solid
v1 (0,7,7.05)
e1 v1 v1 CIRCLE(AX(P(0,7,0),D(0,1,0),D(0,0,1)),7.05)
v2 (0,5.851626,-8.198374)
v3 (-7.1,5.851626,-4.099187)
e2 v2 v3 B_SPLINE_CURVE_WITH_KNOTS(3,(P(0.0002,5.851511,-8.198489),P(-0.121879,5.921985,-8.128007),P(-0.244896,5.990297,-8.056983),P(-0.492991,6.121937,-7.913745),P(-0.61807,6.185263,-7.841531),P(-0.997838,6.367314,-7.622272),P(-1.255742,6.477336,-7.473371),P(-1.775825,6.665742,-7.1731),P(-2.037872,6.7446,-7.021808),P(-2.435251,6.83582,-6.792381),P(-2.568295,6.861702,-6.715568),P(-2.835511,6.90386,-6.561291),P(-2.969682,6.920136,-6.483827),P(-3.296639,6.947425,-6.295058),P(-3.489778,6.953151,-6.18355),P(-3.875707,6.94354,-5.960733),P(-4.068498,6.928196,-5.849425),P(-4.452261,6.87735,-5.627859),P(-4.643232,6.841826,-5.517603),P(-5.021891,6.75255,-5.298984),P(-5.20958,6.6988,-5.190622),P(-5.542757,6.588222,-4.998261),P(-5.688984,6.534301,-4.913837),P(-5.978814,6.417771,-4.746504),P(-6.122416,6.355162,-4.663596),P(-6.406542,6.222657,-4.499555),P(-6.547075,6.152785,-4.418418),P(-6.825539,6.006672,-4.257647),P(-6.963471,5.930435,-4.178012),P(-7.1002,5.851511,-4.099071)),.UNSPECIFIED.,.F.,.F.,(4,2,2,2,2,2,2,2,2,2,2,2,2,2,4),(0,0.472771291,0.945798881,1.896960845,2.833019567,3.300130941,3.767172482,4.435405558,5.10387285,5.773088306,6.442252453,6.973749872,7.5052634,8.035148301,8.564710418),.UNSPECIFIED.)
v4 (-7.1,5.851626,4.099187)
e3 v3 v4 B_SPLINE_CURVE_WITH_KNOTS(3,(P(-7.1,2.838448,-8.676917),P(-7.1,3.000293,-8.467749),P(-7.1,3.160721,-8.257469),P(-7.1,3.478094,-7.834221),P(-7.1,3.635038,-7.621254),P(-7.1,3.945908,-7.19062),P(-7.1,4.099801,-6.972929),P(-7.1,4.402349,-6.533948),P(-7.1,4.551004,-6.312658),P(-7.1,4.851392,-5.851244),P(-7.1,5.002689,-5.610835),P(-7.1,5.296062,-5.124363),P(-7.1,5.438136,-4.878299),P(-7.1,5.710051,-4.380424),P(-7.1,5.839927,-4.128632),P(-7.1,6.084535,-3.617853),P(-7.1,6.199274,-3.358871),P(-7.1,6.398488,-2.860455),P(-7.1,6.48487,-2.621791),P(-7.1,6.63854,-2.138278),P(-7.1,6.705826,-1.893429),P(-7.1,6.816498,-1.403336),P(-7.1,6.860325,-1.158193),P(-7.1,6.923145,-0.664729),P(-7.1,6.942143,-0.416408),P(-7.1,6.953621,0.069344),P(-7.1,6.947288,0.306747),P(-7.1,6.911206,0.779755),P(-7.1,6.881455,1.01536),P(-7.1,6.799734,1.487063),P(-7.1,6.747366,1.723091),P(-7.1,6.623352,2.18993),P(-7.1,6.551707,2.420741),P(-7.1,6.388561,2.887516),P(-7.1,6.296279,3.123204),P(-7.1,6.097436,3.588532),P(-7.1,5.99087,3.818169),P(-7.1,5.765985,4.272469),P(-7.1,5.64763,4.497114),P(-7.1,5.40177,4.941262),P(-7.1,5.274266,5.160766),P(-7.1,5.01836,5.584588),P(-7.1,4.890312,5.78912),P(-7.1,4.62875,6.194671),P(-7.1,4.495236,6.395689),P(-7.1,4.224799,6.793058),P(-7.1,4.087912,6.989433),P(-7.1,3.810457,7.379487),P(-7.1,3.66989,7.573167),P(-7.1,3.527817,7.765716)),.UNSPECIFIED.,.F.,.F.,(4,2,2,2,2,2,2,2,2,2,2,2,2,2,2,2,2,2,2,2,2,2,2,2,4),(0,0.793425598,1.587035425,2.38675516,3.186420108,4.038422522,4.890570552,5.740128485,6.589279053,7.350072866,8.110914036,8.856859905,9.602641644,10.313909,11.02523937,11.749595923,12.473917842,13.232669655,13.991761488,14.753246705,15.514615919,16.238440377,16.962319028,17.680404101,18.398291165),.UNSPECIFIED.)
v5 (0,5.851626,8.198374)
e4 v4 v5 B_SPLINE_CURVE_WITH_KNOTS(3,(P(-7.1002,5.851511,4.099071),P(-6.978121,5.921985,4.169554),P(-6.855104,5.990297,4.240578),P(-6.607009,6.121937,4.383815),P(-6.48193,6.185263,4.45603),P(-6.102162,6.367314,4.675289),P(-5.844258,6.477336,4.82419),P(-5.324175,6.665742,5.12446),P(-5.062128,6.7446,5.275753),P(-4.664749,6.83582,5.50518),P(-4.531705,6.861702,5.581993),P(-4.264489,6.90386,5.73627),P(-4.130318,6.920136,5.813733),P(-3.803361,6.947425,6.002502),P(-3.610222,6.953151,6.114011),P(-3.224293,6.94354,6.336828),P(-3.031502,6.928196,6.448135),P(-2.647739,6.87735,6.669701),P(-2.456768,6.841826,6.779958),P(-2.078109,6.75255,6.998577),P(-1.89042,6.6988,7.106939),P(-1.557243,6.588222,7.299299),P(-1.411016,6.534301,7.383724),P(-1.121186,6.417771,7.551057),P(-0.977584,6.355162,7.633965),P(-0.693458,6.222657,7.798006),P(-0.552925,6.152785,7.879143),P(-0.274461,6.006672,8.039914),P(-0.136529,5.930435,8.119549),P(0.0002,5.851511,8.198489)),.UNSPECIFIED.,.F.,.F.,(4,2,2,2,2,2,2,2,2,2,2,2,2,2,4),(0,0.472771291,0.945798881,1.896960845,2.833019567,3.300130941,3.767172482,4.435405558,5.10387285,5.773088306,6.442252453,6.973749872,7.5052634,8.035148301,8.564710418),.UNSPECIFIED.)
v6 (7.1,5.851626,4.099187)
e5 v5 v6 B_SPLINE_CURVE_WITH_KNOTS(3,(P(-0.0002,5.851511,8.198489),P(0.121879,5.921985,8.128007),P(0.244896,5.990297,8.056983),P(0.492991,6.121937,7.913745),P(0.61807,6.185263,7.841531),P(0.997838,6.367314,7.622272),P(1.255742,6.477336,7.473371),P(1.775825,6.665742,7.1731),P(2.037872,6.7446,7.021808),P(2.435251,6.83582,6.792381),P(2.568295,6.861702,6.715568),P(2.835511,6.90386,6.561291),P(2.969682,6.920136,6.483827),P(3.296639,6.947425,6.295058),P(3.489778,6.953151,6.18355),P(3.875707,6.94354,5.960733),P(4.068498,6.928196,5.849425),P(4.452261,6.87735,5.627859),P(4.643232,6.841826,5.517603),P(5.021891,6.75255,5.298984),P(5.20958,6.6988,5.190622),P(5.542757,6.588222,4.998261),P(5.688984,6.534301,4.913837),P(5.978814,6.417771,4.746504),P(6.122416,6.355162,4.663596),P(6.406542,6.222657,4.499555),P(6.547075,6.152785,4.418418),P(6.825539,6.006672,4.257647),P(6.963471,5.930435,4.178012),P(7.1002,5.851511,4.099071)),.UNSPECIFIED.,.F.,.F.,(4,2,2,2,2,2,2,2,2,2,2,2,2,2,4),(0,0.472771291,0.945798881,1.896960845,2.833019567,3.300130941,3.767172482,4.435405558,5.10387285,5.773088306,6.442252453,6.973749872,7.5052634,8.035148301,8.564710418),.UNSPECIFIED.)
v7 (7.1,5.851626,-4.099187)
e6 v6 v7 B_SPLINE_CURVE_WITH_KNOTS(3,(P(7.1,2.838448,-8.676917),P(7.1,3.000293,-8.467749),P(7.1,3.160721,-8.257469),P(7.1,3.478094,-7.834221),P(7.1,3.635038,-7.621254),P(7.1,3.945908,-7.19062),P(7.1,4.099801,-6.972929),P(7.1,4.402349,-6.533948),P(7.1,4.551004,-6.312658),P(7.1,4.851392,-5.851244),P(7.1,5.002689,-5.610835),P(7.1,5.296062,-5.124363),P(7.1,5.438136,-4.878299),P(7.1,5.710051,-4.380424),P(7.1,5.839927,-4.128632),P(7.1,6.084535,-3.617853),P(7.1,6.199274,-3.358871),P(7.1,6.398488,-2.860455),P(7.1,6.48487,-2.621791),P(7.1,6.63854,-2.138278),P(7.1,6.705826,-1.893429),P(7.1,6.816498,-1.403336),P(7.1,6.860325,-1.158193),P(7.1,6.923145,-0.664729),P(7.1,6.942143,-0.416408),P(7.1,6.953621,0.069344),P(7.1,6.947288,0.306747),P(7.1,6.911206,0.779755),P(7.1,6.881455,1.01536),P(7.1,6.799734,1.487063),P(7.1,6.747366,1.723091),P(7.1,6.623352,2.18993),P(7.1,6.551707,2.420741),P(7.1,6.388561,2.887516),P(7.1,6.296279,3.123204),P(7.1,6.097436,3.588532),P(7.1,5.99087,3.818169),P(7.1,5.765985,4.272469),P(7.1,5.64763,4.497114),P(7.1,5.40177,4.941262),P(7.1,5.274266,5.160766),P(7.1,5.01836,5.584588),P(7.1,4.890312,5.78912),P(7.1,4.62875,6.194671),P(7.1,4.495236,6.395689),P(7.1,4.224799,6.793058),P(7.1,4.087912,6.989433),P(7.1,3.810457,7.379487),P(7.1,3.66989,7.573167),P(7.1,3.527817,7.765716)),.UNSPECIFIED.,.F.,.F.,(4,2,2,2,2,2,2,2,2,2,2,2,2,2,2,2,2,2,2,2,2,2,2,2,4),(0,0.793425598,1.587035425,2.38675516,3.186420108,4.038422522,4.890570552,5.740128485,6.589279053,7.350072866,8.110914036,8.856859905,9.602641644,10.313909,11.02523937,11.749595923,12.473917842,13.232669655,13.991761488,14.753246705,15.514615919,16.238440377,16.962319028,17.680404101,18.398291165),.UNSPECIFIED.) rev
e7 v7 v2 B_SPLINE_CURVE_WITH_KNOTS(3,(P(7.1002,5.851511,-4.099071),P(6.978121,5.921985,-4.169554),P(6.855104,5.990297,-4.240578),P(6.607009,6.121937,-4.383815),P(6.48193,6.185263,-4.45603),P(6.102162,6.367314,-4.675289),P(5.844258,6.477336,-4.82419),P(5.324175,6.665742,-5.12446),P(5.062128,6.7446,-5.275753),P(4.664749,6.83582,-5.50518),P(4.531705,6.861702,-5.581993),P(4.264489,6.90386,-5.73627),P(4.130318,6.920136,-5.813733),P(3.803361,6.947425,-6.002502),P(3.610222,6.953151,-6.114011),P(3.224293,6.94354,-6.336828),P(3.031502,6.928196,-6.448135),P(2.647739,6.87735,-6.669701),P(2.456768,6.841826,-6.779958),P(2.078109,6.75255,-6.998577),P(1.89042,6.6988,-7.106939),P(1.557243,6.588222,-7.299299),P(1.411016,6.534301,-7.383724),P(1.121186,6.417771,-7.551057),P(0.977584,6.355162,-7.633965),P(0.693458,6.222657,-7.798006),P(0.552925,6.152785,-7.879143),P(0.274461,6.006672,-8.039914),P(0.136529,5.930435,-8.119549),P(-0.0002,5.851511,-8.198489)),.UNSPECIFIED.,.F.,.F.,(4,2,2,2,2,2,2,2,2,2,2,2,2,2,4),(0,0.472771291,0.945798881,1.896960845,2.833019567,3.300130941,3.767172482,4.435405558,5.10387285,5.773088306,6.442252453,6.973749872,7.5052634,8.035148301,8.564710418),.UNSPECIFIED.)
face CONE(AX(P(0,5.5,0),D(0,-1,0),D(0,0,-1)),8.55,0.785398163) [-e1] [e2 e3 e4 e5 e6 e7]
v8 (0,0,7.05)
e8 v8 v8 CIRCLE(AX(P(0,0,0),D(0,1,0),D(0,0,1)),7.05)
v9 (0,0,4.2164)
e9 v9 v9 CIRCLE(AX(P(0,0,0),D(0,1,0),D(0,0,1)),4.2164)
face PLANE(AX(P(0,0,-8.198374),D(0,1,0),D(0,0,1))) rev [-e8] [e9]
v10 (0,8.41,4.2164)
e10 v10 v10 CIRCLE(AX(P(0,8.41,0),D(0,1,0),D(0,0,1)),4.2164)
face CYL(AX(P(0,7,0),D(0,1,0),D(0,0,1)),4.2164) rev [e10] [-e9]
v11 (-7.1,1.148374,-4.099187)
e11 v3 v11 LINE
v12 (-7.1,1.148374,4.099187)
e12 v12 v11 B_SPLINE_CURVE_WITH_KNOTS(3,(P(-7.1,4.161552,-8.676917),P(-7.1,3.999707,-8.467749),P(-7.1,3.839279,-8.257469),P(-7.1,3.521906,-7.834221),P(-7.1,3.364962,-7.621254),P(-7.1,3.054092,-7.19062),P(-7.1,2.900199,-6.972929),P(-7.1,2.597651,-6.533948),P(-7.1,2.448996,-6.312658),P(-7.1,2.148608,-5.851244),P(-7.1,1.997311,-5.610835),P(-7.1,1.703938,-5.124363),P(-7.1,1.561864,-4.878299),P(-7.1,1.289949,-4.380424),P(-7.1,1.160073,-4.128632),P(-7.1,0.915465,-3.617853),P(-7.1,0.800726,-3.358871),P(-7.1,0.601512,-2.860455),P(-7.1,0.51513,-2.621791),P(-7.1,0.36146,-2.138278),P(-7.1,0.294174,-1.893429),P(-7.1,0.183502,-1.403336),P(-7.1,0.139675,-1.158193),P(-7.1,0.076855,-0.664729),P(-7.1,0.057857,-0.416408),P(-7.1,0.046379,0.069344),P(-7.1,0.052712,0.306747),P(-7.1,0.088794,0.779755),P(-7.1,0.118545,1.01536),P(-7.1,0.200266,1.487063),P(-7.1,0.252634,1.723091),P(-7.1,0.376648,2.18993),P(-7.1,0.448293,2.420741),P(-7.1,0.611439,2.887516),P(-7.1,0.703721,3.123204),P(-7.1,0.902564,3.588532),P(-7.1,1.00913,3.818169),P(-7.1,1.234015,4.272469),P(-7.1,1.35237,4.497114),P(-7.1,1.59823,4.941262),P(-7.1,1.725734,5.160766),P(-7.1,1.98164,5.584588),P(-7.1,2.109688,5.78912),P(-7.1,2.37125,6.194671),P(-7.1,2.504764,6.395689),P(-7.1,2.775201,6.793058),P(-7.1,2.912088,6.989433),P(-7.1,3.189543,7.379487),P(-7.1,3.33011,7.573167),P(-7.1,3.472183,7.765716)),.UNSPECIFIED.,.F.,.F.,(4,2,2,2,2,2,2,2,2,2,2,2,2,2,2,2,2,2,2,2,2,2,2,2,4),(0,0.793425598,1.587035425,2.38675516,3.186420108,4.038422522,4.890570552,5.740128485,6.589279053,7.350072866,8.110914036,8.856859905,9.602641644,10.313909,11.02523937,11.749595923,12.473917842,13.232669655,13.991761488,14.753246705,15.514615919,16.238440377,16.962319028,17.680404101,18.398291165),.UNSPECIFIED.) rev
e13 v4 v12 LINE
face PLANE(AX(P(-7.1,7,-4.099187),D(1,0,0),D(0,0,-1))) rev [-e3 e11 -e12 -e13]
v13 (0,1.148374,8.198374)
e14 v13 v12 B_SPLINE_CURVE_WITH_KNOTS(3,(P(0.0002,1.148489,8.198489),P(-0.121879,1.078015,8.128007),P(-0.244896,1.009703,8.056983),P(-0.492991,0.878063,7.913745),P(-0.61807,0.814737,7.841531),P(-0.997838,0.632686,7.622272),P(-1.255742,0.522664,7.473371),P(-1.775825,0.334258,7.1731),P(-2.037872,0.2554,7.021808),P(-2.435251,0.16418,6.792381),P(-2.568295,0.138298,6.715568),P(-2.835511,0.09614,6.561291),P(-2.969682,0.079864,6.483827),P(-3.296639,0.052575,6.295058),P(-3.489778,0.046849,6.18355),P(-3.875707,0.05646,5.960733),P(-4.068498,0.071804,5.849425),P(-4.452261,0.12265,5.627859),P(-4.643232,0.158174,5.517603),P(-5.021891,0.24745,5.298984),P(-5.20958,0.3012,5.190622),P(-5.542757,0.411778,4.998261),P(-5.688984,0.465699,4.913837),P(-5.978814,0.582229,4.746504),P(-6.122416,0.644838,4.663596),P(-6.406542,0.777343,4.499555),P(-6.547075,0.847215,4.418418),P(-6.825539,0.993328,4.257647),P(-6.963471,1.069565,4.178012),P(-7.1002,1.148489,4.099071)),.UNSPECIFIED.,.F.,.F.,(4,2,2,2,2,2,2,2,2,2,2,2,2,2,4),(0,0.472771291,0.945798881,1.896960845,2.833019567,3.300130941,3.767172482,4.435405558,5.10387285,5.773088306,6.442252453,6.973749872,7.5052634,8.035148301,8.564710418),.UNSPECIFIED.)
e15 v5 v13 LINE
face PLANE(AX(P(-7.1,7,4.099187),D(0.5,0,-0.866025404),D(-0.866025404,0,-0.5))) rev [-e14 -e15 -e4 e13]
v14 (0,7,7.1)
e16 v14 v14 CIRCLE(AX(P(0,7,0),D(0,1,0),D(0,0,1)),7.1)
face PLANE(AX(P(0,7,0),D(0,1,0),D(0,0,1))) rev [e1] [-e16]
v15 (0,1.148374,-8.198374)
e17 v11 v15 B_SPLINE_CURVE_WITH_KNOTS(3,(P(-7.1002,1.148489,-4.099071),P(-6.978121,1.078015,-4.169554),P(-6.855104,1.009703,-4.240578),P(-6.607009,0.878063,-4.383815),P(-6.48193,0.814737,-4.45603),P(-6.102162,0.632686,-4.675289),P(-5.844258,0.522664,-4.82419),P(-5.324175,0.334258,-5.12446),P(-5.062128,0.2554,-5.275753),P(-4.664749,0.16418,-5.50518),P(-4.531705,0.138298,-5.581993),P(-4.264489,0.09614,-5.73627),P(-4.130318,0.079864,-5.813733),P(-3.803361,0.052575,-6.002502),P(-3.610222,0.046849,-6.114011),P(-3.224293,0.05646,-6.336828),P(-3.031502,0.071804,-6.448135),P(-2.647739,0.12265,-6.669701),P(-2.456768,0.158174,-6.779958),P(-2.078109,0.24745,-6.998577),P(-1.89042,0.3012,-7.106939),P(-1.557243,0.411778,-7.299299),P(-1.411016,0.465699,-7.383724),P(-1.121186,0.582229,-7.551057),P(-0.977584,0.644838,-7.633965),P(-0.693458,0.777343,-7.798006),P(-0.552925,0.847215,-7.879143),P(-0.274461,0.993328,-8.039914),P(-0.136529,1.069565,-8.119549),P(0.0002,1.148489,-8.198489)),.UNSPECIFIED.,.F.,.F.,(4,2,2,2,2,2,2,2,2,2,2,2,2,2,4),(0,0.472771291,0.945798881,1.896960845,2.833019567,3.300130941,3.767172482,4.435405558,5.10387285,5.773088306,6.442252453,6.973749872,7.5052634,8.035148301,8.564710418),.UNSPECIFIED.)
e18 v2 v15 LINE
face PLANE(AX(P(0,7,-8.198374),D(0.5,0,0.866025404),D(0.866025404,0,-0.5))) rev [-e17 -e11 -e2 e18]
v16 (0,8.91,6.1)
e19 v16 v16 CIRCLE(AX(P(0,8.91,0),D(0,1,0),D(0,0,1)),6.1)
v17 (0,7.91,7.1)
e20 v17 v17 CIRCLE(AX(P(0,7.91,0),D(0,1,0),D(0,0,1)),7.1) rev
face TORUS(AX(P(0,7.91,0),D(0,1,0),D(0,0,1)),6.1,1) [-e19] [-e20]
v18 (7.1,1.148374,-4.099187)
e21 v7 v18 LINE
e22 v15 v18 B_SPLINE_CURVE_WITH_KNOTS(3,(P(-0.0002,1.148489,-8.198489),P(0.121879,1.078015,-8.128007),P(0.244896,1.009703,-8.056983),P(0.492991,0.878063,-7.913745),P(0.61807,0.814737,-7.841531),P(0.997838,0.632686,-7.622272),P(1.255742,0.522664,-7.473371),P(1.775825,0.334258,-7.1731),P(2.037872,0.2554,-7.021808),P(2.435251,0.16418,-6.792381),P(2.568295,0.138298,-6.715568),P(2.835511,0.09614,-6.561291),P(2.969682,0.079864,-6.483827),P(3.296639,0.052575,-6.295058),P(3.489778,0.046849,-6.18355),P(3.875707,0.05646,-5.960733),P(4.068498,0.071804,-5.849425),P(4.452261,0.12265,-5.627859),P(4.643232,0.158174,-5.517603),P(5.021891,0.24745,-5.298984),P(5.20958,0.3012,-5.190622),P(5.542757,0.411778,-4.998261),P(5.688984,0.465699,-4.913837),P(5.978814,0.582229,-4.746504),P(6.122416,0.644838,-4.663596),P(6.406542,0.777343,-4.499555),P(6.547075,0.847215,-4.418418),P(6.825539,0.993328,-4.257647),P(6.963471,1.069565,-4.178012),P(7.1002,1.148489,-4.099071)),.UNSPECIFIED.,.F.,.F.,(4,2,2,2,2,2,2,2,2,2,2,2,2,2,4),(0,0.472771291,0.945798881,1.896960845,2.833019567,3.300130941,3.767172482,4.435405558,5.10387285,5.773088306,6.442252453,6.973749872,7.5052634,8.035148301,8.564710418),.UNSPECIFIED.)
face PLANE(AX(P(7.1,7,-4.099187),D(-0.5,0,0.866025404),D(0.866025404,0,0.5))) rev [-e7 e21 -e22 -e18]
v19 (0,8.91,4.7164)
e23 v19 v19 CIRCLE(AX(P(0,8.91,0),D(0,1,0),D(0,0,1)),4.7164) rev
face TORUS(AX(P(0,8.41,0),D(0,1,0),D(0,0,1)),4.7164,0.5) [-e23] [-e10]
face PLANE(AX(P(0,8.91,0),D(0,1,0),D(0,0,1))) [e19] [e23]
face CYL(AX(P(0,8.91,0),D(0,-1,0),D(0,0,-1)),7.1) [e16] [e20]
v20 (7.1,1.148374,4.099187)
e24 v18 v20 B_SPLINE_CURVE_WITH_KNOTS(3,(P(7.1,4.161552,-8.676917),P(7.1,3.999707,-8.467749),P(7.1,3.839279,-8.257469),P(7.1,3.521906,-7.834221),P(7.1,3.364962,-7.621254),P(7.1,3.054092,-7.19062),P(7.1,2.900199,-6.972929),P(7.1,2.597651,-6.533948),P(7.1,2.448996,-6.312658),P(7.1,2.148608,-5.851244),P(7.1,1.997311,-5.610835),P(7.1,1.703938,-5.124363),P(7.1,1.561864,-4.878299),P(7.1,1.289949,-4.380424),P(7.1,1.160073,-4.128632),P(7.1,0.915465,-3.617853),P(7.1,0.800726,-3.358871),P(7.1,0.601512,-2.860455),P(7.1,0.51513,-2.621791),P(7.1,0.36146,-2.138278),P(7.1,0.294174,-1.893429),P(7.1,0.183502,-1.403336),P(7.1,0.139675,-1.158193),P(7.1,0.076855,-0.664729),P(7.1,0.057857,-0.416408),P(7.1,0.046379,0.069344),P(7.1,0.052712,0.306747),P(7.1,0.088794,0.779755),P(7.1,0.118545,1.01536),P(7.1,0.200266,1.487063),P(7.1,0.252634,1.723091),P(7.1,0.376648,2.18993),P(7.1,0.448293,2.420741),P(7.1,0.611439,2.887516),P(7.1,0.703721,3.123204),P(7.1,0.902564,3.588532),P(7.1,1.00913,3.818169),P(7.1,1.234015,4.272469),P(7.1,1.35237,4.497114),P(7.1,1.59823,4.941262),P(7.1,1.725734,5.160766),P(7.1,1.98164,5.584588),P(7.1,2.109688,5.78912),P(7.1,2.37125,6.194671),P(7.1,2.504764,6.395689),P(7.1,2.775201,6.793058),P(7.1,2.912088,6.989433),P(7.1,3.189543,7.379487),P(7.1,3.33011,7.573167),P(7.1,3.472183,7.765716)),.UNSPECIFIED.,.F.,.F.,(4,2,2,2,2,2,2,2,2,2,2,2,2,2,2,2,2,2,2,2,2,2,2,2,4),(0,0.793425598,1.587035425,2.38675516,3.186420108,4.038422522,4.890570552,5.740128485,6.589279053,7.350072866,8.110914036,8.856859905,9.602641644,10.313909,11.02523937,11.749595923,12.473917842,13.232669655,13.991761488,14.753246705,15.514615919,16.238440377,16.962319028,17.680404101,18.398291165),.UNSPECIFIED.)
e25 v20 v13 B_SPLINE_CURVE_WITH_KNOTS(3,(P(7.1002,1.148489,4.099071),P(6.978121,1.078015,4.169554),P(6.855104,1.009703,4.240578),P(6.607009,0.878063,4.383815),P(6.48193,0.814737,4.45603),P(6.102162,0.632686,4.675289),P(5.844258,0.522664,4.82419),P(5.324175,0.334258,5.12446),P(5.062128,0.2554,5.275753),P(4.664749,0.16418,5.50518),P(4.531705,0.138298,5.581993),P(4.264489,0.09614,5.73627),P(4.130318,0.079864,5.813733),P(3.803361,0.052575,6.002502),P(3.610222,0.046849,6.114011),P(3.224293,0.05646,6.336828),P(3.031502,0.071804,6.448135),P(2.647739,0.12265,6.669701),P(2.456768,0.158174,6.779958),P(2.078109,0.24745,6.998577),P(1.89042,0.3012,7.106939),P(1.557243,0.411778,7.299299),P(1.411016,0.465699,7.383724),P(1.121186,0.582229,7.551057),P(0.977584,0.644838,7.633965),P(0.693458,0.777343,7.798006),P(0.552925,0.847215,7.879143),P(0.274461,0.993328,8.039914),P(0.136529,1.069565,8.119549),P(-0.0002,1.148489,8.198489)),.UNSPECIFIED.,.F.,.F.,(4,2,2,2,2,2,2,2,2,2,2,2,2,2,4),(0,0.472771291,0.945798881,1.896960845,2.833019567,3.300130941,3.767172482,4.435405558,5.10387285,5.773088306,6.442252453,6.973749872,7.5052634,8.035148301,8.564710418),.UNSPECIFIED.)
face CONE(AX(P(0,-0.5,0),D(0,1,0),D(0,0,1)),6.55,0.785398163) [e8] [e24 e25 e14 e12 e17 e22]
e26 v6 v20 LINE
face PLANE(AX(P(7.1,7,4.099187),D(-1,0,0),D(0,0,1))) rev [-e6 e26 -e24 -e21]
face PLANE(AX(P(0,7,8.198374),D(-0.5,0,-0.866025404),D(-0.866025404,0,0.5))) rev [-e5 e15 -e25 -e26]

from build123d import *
from build123d.topology import SkipClean

# Parameters (mm, degrees)
SKETCH1_R                   = 4
BOSS_EXTRUDE1_DEPTH         = 7
F_3_8_24_TAPPED_HOLE6_D     = 8.4328
F_3_8_24_TAPPED_HOLE6_DEPTH = 15.3
F_3_8_24_TAPPED_HOLE6_TIP   = 2.533468714
SKETCH9_R                   = 7.1
SKETCH9_R_2                 = 4.2164
BOSS_EXTRUDE3_DEPTH         = 1.91
FILLET3_R                   = 1
FILLET4_R                   = 0.5


with BuildPart() as part:
    # Sketch1 → Boss-Extrude1 (new body)
    with BuildSketch(Plane(origin=(0, 0, 0), x_dir=(1, 0, 0), z_dir=(0, 1, 0))):
        Polygon((0, 8.198373822), (-7.1, 4.099186911), (-7.1, -4.099186911), (0, -8.198373822), (7.1, -4.099186911), (7.1, 4.099186911), align=None)
        Circle(SKETCH1_R, mode=Mode.SUBTRACT)
    extrude(amount=BOSS_EXTRUDE1_DEPTH)

    # 3/8-24 Tapped Hole6
    with Locations(Plane.ZX.offset(7)):
        with Locations((0, 0)):
            Hole(F_3_8_24_TAPPED_HOLE6_D / 2, depth=F_3_8_24_TAPPED_HOLE6_DEPTH)
            with Locations((0, 0, -(F_3_8_24_TAPPED_HOLE6_DEPTH + F_3_8_24_TAPPED_HOLE6_TIP / 2))):  # 118° drill point
                Cone(0, F_3_8_24_TAPPED_HOLE6_D / 2, F_3_8_24_TAPPED_HOLE6_TIP, mode=Mode.SUBTRACT)

    # Sketch8 → Cut-Revolve4 (revolve, cut)
    with BuildSketch(Plane.XY):
        Polygon((-6.55, -0.5), (-8.05, -0.5), (-11.05, -0.5), (-11.05, 1), (-11.05, 1.5), (-8.55, 1.5), align=None)
        Polygon((-11.05, 5.5), (-11.05, 6), (-11.05, 7.5), (-8.05, 7.5), (-6.55, 7.5), (-8.55, 5.5), align=None)
    revolve(axis=Axis((0, 0, 0), (0, 1, 0)), mode=Mode.SUBTRACT)

    # Sketch9 → Boss-Extrude3 (add)
    with SkipClean():  # the faces are left unmerged after this step: merging them gives an invalid solid
        with BuildSketch(Plane(origin=(0, 7, 0), x_dir=(1, 0, 0), z_dir=(0, 1, 0))):
            Circle(SKETCH9_R)
            Circle(SKETCH9_R_2, mode=Mode.SUBTRACT)
        extrude(amount=BOSS_EXTRUDE3_DEPTH)
    add(part.part.scale(1), mode=Mode.REPLACE)  # the faces are merged on a copy

    # Fillet3
    fillet3_edges = [part.edges().sort_by_distance(p)[0] for p in [
        (-7.1, 8.91, 0),
    ]]
    fillet(fillet3_edges, radius=FILLET3_R)

    # Fillet4
    fillet4_edges = [part.edges().sort_by_distance(p)[0] for p in [
        (-4.2164, 8.91, 0),
    ]]
    fillet(fillet4_edges, radius=FILLET4_R)


solid = part.part
